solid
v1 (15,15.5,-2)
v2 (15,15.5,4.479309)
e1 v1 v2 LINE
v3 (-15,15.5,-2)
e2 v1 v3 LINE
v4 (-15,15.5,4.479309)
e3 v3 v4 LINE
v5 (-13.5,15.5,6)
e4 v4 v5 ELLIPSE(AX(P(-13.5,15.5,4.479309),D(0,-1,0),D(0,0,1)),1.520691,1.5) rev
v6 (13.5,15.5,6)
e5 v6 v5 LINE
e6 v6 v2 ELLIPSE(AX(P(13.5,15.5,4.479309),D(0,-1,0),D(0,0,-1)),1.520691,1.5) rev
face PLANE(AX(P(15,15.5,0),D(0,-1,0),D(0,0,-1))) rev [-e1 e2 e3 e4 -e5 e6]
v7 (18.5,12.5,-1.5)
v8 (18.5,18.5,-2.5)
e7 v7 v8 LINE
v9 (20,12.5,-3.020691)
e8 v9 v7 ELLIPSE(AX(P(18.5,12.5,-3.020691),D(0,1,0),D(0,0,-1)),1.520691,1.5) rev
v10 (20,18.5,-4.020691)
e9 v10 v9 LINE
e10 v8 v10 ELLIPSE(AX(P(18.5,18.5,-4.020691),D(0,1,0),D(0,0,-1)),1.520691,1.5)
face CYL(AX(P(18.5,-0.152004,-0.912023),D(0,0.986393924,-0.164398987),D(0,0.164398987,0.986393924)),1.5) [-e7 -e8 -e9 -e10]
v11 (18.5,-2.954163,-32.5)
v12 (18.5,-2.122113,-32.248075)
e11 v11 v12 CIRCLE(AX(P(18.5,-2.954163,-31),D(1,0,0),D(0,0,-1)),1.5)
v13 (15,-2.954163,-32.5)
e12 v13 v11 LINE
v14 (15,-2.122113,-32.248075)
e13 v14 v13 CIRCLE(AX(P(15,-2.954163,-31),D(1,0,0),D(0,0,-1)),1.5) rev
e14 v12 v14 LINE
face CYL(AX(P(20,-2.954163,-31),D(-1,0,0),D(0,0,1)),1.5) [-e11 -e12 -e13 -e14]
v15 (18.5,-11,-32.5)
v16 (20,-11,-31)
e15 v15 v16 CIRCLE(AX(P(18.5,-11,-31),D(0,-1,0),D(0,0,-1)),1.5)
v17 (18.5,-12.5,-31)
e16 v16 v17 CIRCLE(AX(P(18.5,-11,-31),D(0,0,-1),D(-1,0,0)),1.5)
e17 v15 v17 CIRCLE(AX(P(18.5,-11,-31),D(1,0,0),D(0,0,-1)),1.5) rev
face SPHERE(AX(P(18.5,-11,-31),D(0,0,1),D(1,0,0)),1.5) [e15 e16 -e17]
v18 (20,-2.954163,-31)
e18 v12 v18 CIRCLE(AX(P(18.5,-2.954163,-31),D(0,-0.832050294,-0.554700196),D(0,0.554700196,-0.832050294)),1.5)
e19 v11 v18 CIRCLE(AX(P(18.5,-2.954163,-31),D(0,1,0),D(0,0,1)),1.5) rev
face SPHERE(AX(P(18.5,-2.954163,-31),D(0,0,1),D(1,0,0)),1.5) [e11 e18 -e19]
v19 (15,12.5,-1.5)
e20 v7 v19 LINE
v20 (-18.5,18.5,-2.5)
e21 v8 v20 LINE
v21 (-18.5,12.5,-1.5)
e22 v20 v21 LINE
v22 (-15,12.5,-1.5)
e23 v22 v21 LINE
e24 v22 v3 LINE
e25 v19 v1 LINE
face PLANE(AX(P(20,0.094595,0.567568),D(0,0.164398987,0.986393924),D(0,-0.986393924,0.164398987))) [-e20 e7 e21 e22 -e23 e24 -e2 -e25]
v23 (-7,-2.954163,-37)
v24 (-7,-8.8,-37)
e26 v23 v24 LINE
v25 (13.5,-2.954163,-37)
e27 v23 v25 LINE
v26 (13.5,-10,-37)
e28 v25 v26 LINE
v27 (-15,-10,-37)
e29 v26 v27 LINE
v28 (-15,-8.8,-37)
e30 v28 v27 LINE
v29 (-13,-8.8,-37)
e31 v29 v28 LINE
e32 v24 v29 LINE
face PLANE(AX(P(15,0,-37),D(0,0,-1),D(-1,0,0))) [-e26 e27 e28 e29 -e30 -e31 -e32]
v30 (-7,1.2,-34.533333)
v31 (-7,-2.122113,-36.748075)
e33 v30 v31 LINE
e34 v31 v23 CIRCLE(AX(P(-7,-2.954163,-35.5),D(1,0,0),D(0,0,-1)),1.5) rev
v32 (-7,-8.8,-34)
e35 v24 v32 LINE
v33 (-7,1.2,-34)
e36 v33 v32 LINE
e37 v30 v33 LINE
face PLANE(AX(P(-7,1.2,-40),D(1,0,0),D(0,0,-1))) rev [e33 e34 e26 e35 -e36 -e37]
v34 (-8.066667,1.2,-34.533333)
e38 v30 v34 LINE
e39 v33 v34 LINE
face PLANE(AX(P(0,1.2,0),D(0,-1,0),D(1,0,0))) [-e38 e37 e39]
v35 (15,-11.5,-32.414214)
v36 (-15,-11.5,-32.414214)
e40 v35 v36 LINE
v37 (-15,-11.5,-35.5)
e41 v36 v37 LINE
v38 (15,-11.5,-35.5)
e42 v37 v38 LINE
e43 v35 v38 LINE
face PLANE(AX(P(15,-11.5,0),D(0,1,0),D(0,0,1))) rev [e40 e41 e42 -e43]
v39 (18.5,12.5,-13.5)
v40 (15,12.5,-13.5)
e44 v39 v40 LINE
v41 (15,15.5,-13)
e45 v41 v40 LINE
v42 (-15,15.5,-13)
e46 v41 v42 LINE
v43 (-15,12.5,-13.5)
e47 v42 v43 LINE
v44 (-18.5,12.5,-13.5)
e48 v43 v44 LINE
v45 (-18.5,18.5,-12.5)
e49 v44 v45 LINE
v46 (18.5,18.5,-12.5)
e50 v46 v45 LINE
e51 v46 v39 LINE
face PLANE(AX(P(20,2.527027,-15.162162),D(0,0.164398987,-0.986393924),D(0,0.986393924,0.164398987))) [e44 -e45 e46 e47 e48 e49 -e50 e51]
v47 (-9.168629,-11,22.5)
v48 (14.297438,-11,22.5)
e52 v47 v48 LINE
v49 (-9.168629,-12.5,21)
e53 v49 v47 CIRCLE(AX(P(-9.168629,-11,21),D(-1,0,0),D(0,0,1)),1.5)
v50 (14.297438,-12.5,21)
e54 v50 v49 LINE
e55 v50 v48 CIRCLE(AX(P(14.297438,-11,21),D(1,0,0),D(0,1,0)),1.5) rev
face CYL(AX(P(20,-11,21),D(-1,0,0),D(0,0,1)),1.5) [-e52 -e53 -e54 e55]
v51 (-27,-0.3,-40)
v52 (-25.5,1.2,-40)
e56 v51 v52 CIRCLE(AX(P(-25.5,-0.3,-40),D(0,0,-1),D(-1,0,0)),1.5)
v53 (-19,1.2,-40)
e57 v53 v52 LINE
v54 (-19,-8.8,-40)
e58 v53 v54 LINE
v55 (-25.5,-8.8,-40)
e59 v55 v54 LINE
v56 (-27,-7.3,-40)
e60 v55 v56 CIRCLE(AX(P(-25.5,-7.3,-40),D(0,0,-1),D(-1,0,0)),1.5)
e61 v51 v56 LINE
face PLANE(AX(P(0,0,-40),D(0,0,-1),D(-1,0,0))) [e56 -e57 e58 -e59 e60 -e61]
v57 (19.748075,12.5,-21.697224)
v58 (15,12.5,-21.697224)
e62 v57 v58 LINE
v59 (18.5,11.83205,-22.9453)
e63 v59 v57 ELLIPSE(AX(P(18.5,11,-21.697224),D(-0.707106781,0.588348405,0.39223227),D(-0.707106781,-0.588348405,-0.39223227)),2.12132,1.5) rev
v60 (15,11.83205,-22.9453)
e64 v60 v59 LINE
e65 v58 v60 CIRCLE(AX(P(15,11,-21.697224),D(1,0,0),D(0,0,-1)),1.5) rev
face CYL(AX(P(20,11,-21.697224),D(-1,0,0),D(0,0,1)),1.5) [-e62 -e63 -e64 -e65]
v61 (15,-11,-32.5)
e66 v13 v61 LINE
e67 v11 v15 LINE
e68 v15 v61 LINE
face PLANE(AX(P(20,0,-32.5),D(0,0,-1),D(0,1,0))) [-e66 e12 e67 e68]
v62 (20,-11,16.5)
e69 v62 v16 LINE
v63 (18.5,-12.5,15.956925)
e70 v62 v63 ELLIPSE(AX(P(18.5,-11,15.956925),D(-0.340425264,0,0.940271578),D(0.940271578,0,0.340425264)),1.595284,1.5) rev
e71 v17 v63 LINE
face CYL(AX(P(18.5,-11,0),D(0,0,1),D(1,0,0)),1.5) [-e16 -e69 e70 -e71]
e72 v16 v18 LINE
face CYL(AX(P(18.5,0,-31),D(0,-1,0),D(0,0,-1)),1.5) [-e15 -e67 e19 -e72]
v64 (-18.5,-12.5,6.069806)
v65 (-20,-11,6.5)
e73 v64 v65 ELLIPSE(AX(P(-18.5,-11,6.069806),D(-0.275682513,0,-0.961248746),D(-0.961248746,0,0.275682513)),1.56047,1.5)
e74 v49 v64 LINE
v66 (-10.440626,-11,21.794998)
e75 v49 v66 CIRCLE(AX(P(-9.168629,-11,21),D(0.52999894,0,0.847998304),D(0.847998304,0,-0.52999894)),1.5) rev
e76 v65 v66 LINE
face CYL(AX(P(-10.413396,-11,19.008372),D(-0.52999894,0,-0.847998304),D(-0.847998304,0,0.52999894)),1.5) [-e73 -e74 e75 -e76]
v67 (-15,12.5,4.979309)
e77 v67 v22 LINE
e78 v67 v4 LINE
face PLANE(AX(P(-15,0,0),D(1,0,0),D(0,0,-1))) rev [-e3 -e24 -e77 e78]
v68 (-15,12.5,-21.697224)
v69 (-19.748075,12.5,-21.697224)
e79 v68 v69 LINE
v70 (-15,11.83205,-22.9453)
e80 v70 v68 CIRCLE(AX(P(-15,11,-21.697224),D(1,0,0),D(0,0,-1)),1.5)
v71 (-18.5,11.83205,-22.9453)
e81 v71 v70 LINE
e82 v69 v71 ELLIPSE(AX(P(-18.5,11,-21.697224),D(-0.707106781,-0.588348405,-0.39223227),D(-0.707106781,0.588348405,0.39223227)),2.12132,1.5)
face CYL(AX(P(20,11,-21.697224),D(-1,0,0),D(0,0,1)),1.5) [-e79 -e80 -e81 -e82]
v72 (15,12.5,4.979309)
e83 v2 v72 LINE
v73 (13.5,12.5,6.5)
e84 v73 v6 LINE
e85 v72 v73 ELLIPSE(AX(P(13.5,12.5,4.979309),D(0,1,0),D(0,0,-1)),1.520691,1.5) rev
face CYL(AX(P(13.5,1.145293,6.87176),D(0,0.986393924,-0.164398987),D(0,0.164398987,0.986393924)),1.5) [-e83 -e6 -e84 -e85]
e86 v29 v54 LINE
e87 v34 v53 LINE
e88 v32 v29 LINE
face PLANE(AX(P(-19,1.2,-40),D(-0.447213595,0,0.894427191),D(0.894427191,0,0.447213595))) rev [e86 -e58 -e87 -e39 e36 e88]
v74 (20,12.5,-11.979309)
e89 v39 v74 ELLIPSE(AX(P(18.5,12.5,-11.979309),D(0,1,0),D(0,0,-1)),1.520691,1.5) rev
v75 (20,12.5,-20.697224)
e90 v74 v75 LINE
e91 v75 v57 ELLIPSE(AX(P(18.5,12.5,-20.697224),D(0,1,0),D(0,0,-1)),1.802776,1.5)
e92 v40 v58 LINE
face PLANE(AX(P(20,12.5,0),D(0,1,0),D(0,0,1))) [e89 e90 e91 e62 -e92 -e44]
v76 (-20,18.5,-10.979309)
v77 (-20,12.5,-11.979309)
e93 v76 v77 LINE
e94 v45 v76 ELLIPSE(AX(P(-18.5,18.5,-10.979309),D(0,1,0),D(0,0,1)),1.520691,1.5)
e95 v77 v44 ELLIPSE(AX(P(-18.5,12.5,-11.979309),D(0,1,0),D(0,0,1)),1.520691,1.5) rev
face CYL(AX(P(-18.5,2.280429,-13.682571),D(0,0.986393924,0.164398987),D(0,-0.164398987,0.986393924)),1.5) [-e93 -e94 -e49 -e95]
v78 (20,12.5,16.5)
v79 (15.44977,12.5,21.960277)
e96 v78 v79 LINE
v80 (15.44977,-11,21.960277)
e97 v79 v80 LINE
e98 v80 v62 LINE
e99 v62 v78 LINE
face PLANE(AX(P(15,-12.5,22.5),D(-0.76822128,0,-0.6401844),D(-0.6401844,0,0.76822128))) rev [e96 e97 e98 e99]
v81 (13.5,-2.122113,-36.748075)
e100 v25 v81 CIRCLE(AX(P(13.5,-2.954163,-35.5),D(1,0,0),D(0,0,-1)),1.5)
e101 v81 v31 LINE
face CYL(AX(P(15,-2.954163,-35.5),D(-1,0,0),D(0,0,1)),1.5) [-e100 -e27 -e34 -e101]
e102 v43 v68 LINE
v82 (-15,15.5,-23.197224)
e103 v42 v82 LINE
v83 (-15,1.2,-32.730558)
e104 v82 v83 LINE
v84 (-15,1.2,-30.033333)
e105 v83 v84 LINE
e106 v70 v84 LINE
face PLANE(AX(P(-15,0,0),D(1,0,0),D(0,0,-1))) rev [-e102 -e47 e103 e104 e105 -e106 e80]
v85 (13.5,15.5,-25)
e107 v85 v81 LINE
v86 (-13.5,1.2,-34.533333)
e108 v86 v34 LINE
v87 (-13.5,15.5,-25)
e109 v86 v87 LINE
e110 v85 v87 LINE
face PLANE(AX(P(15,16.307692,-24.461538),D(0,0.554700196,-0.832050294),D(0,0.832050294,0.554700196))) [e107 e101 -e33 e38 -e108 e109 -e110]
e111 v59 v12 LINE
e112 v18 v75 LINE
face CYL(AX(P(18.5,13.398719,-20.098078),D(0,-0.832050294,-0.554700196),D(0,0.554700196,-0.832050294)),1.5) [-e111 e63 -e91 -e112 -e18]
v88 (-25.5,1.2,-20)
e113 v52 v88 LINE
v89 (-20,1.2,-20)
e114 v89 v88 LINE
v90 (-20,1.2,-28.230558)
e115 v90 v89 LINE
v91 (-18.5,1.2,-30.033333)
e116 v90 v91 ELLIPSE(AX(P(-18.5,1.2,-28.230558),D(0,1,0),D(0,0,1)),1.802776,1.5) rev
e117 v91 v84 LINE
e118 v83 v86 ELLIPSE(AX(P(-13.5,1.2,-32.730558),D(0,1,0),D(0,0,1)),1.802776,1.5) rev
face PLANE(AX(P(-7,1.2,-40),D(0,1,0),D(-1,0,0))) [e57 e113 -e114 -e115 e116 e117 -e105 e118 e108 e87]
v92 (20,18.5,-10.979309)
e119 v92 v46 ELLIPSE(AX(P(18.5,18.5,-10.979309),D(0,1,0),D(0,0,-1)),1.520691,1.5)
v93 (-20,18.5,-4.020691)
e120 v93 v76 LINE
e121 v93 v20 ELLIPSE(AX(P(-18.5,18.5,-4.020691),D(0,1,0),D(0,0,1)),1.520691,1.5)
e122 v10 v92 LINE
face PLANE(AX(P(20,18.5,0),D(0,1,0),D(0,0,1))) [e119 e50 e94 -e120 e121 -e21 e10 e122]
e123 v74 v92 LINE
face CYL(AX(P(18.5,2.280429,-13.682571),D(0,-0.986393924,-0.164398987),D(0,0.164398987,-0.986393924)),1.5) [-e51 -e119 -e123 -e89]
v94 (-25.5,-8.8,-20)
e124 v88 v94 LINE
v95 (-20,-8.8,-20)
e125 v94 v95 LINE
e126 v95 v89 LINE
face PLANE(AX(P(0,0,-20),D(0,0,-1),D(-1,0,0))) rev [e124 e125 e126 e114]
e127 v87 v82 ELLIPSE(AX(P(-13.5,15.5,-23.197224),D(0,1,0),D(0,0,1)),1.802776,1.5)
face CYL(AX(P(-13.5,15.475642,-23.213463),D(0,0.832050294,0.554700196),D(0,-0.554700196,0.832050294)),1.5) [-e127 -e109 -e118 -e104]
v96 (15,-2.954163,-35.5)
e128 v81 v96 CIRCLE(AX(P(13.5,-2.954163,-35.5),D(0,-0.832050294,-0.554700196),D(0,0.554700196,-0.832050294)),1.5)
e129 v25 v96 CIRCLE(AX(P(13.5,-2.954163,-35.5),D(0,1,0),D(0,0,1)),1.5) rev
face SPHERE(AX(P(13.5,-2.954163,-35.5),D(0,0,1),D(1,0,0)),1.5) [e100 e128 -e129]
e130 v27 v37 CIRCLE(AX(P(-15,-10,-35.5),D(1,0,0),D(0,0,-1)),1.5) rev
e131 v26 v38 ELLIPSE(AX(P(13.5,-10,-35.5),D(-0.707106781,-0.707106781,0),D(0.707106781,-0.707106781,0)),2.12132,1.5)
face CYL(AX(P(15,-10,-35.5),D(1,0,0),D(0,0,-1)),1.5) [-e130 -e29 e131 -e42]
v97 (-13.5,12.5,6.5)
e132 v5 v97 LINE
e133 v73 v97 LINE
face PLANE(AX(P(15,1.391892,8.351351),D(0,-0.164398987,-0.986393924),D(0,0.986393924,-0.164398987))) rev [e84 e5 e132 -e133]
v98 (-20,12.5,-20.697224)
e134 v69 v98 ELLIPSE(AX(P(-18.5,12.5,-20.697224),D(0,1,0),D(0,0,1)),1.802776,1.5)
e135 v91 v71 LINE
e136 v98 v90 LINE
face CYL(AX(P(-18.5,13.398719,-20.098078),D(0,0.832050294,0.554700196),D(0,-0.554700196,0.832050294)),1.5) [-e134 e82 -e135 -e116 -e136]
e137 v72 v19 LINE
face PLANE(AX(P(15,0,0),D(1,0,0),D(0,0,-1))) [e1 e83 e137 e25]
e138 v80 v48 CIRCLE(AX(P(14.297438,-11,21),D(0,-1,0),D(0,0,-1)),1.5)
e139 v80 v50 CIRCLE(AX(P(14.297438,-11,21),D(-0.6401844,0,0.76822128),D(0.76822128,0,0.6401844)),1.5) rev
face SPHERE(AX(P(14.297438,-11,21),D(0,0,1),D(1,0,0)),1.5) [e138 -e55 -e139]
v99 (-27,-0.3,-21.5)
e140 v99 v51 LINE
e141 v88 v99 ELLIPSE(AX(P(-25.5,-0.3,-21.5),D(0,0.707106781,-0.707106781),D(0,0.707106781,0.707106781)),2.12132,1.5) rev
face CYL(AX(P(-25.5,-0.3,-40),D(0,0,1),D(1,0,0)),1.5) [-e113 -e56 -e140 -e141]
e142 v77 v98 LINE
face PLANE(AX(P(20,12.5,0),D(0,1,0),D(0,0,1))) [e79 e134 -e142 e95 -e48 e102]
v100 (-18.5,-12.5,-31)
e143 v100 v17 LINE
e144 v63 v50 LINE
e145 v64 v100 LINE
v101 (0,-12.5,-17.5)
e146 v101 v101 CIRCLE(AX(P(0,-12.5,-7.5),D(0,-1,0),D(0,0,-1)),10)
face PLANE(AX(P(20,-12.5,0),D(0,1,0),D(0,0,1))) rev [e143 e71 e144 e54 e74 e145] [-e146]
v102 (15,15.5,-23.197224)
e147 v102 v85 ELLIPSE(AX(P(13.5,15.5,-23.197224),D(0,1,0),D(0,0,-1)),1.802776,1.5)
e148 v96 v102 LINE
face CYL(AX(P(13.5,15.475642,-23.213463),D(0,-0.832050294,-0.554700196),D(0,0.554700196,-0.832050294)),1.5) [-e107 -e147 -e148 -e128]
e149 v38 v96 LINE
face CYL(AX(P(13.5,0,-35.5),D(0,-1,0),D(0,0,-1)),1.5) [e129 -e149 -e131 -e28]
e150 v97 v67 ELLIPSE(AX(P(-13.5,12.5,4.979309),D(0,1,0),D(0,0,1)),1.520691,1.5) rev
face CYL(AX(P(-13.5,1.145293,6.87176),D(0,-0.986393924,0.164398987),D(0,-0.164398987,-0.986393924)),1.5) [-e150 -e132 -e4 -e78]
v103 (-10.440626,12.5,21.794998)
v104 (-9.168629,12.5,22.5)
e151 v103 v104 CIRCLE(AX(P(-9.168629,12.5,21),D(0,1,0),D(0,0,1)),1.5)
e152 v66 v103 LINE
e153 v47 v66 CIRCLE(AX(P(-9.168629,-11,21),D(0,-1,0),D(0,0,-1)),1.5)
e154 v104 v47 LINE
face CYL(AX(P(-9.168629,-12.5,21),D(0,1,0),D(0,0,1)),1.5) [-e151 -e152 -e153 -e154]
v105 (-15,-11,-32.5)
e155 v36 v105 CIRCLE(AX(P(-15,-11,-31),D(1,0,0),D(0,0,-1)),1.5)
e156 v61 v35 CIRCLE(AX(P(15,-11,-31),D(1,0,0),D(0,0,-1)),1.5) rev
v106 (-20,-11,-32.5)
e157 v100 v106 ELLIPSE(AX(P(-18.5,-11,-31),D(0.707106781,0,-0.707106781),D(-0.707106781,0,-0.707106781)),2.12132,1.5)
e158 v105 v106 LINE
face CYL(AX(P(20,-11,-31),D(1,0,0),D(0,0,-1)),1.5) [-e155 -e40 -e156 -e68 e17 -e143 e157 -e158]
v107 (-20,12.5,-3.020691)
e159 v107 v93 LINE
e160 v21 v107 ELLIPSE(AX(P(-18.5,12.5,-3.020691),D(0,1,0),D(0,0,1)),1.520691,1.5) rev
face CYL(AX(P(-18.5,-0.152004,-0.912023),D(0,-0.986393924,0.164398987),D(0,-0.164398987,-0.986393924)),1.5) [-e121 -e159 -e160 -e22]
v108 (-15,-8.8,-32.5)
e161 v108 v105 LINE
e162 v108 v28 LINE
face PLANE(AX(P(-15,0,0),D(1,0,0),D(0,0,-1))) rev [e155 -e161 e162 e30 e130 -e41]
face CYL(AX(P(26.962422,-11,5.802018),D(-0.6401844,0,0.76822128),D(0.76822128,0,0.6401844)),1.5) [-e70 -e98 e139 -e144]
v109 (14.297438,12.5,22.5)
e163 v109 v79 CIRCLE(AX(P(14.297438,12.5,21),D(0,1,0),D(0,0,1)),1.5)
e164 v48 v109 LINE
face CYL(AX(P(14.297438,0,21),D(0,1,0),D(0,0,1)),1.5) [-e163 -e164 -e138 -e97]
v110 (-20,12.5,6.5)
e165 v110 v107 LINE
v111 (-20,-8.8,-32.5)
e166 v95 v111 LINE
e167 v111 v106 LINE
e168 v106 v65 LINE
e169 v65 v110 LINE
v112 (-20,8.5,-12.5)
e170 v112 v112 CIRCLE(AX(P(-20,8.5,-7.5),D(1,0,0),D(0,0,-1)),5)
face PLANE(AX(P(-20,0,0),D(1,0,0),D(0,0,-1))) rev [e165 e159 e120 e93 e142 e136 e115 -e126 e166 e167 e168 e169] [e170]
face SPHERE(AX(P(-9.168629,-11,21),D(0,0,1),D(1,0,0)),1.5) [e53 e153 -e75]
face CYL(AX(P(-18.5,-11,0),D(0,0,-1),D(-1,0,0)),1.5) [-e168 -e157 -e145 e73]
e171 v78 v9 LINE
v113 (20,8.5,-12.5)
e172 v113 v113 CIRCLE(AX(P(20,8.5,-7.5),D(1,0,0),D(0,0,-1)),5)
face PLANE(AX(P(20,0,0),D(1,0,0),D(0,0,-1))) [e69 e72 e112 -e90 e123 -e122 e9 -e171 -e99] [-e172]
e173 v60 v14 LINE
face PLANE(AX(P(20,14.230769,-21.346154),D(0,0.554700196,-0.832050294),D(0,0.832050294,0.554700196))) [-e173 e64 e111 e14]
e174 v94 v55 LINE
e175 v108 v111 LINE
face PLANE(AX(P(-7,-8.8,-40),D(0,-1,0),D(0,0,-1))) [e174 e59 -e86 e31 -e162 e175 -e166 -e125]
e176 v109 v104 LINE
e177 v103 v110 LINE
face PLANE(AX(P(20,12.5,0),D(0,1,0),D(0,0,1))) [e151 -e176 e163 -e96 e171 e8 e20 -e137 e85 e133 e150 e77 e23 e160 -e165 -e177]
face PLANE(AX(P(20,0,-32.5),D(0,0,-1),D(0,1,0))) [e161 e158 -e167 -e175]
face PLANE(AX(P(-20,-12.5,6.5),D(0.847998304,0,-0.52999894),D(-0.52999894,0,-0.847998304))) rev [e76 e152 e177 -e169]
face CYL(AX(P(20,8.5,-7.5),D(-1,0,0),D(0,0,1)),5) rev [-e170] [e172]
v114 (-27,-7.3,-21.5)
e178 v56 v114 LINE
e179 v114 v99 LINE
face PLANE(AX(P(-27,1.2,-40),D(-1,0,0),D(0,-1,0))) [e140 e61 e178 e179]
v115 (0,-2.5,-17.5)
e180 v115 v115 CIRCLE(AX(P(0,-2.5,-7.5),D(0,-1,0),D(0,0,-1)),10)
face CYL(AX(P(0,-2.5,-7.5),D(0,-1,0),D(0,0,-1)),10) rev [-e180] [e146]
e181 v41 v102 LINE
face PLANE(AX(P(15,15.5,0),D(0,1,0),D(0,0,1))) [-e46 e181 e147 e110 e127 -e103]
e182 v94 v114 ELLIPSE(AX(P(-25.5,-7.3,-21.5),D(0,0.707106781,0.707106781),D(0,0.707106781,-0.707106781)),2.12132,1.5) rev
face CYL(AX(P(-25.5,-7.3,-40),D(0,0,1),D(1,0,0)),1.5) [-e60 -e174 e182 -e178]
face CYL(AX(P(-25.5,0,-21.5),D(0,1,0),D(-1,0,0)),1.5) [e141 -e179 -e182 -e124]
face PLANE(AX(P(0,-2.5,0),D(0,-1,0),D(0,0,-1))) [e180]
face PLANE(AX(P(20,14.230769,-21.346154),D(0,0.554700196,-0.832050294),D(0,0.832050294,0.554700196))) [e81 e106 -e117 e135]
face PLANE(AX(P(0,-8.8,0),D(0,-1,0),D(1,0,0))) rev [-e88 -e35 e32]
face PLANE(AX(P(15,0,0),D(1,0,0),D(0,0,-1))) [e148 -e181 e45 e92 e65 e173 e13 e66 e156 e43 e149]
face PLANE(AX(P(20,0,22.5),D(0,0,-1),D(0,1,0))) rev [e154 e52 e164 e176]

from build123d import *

# Parameters (mm, degrees)
SKETCH1_R           = 5
BOSS_EXTRUDE1_DEPTH = 20
BOSS_EXTRUDE2_DEPTH = 15
CUT_EXTRUDE2_DEPTH  = 49.928519291
BOSS_EXTRUDE3_START = -20
SKETCH4_W           = 20
SKETCH4_H           = 10
BOSS_EXTRUDE3_DEPTH = 20
CUT_EXTRUDE3_DEPTH  = 5
SKETCH2_R           = 10
CUT_EXTRUDE1_DEPTH  = 10
FILLET1_R           = 1.5


with BuildPart() as part:
    # Sketch1 → Boss-Extrude1 (new, symmetric)
    with BuildSketch(Plane(origin=(0, 0, 0), x_dir=(0, 0, -1), z_dir=(1, 0, 0))):
        Polygon((13.5, 12.5), (22.5, 12.5), (32.5, -2.5), (32.5, -12.5), (-22.5, -12.5), (-22.5, 12.5), (1.5, 12.5), (2.5, 18.5), (12.5, 18.5), align=None)
        with Locations((7.5, 8.5)):
            Circle(SKETCH1_R, mode=Mode.SUBTRACT)
    extrude(amount=BOSS_EXTRUDE1_DEPTH, both=True)

    # Sketch1<3> → Boss-Extrude2 (add, symmetric)
    with BuildSketch(Plane(origin=(0, 0, 0), x_dir=(0, 0, -1), z_dir=(1, 0, 0))):
        Polygon((13.5, 12.5), (22.5, 12.5), (32.5, -2.5), (32.5, -11.5), (37, -11.5), (37, -2.5), (25, 15.5), (13, 15.5), align=None)
        Polygon((1.5, 12.5), (2, 15.5), (-6, 15.5), (-6.5, 12.5), align=None)
    extrude(amount=BOSS_EXTRUDE2_DEPTH, both=True)

    # Sketch3 → Cut-Extrude2 (cut, through all)
    with BuildSketch(Plane(origin=(0, 12.5, 0), x_dir=(1, 0, 0), z_dir=(0, 1, 0))):
        Polygon((15, -22.5), (20, -16.5), (20, -22.5), align=None)
        Polygon((-10, -22.5), (-20, -22.5), (-20, -6.5), align=None)
    extrude(amount=-CUT_EXTRUDE2_DEPTH, mode=Mode.SUBTRACT)

    # Sketch4 → Boss-Extrude3 (add)
    with BuildSketch(Plane.XY.offset(BOSS_EXTRUDE3_START)):
        with Locations((-17, -3.8)):
            Rectangle(SKETCH4_W, SKETCH4_H)
    extrude(amount=-BOSS_EXTRUDE3_DEPTH)

    # Sketch5 → Cut-Extrude3 (cut, symmetric)
    with BuildSketch(Plane(origin=(0, -3.8, 0), x_dir=(-1, 0, 0), z_dir=(0, -1, 0))):
        Polygon((7, 40), (19, 40), (7, 34), align=None)
    extrude(amount=CUT_EXTRUDE3_DEPTH, both=True, mode=Mode.SUBTRACT)

    # Sketch2 → Cut-Extrude1 (cut)
    with BuildSketch(Plane.XZ.offset(12.5)):
        with Locations(Location((0, -7.5, 0), (0, 0, 270))):
            Circle(SKETCH2_R)
    extrude(amount=-CUT_EXTRUDE1_DEPTH, mode=Mode.SUBTRACT)

    # Fillet1
    # the kernel refuses this fillet: 1.5 mm, written as the material it takes off along each edge
    with BuildSketch(Plane(origin=(-9.168628538, -11, 21), x_dir=(0, 0, 1), z_dir=(0, -1, 0))) as fillet1_piece_1_section:
        Polygon((0, 0), (FILLET1_R, 0), (FILLET1_R, FILLET1_R * 0.554247641507), (FILLET1_R * 0.529998940003, FILLET1_R * 0.847998304005), align=None)
    fillet1_piece_1 = extrude(amount=FILLET1_R, mode=Mode.PRIVATE)
    fillet1_piece_1 = fillet1_piece_1 - Plane(origin=(-9.168628538, -11, 21), x_dir=(0.4847685323929452, 0, -0.8746424812468178), z_dir=(0, -1, 0)) * Sphere(FILLET1_R, mode=Mode.PRIVATE)
    add(fillet1_piece_1, mode=Mode.SUBTRACT)
    with BuildSketch(Plane(origin=(18.5, -2.954163457, -31), x_dir=(0, 0, -1), z_dir=(1, 0, 0))) as fillet1_piece_2_section:
        Polygon((0, 0), (FILLET1_R, 0), (FILLET1_R, FILLET1_R * 0.302775637732), (FILLET1_R * 0.832050294338, FILLET1_R * 0.554700196225), align=None)
    fillet1_piece_2 = extrude(amount=FILLET1_R, mode=Mode.PRIVATE)
    fillet1_piece_2 = fillet1_piece_2 - Plane(origin=(18.5, -2.954163457, -31), x_dir=(0, -0.2897841486884299, 0.9570920264890529), z_dir=(1, 0, 0)) * Sphere(FILLET1_R, mode=Mode.PRIVATE)
    add(fillet1_piece_2, mode=Mode.SUBTRACT)
    with BuildSketch(Plane(origin=(18.5, -11, -31), x_dir=(1, 0, 0), z_dir=(0, 0, -1))) as fillet1_piece_3_section:
        Polygon((0, 0), (FILLET1_R, 0), (FILLET1_R, FILLET1_R), (0, FILLET1_R), align=None)
    fillet1_piece_3 = extrude(amount=FILLET1_R, mode=Mode.PRIVATE)
    fillet1_piece_3 = fillet1_piece_3 - Plane(origin=(18.5, -11, -31), x_dir=(-0.7071067811865475, 0.7071067811865475, 0), z_dir=(0, 0, -1)) * Sphere(FILLET1_R, mode=Mode.PRIVATE)
    add(fillet1_piece_3, mode=Mode.SUBTRACT)
    with BuildSketch(Plane(origin=(13.5, -2.954163457, -35.5), x_dir=(0, 0.5547001962252297, -0.8320502943378434), z_dir=(1, 0, 0))) as fillet1_piece_4_section:
        Polygon((0, 0), (FILLET1_R, 0), (FILLET1_R, -FILLET1_R * 0.302775637732), (FILLET1_R * 0.832050294338, -FILLET1_R * 0.554700196225), align=None)
    fillet1_piece_4 = extrude(amount=FILLET1_R, mode=Mode.PRIVATE)
    fillet1_piece_4 = fillet1_piece_4 - Plane(origin=(13.5, -2.954163457, -35.5), x_dir=(0, -0.2897841486884304, 0.9570920264890528), z_dir=(1, 0, 0)) * Sphere(FILLET1_R, mode=Mode.PRIVATE)
    add(fillet1_piece_4, mode=Mode.SUBTRACT)
    with BuildSketch(Plane(origin=(14.297437581, -11, 21), x_dir=(0, 0, 1), z_dir=(0, -1, 0))) as fillet1_piece_5_section:
        Polygon((0, 0), (FILLET1_R, 0), (FILLET1_R, -FILLET1_R * 0.468374945984), (FILLET1_R * 0.640184399664, -FILLET1_R * 0.768221279597), align=None)
    fillet1_piece_5 = extrude(amount=FILLET1_R, mode=Mode.PRIVATE)
    fillet1_piece_5 = fillet1_piece_5 - Plane(origin=(14.297437581, -11, 21), x_dir=(-0.42415539624972376, 0, -0.90558942122368), z_dir=(0, -1, 0)) * Sphere(FILLET1_R, mode=Mode.PRIVATE)
    add(fillet1_piece_5, mode=Mode.SUBTRACT)
    with BuildSketch(Plane(origin=(-10, 14.578428656, 22.5), x_dir=(-0.5299989400031788, 0, -0.8479983040050887), z_dir=(0, -1, 0))) as fillet1_piece_6:
        with BuildLine():
            CenterArc((FILLET1_R * 0.554247641507, FILLET1_R), FILLET1_R, 212.005383208, 57.994616792)
            Line((-FILLET1_R * 0.293750662498, FILLET1_R * 0.470001059997), (0, 0))
            Line((0, 0), (FILLET1_R * 0.554247641507, 0))
        make_face()
    extrude(amount=25.578428656, mode=Mode.SUBTRACT)
    with BuildSketch(Plane(origin=(20, -2.954163457, -32.5), x_dir=(0, 0, 1), z_dir=(0, -1, 0))) as fillet1_piece_7:
        with BuildLine():
            CenterArc((FILLET1_R, FILLET1_R), FILLET1_R, 180, 90)
            Line((0, FILLET1_R), (0, 0))
            Line((0, 0), (FILLET1_R, 0))
        make_face()
    extrude(amount=8.045836543, mode=Mode.SUBTRACT)
    with BuildSketch(Plane(origin=(15, -15.25, -37), x_dir=(0, 0, 1), z_dir=(0, 1, 0))) as fillet1_piece_8:
        with BuildLine():
            CenterArc((FILLET1_R, -FILLET1_R), FILLET1_R, 90, 90)
            Line((0, -FILLET1_R), (0, 0))
            Line((0, 0), (FILLET1_R, 0))
        make_face()
    extrude(amount=12.295836543, mode=Mode.SUBTRACT)
    with BuildSketch(Plane(origin=(13.5, -2.5, -37), x_dir=(0, 0.8320502943378404, 0.5547001962252341), z_dir=(-1, 0, 0))) as fillet1_piece_9:
        with BuildLine():
            CenterArc((FILLET1_R * 0.302775637732, -FILLET1_R), FILLET1_R, 90, 33.690067526)
            Line((-FILLET1_R * 0.251924558493, -FILLET1_R * 0.167949705662), (0, 0))
            Line((0, 0), (FILLET1_R * 0.302775637732, 0))
        make_face()
    extrude(amount=21.635408641, mode=Mode.SUBTRACT)
    with BuildSketch(Plane(origin=(-15, -1.920188604, -36.613459069), x_dir=(0, -0.5547001962252296, 0.8320502943378434), z_dir=(0, 0.8320502943378434, 0.5547001962252297))) as fillet1_piece_10_section:
        with BuildLine():
            CenterArc((FILLET1_R, FILLET1_R), FILLET1_R, 180, 90)
            Line((0, FILLET1_R), (0, 0))
            Line((0, 0), (FILLET1_R, 0))
        make_face()
    fillet1_piece_10 = extrude(amount=24.68646108, mode=Mode.PRIVATE)
    fillet1_piece_10 = split(fillet1_piece_10, bisect_by=Plane(origin=(-14.658418679, 1.2, -28.384678204), z_dir=(0, 1, 0)), keep=Keep.TOP, mode=Mode.PRIVATE)
    add(fillet1_piece_10, mode=Mode.SUBTRACT)
    with BuildSketch(Plane(origin=(15, -2.122113162, -36.748075442), x_dir=(0, -0.5547001962252296, 0.8320502943378433), z_dir=(0, 0.8320502943378434, 0.5547001962252297))) as fillet1_piece_11:
        with BuildLine():
            CenterArc((FILLET1_R, -FILLET1_R), FILLET1_R, 90, 90)
            Line((0, -FILLET1_R), (0, 0))
            Line((0, 0), (FILLET1_R, 0))
        make_face()
    extrude(amount=24.929144196, mode=Mode.SUBTRACT)
    with BuildSketch(Plane(origin=(20, 15.620188604, -20.419874264), x_dir=(0, -0.5547001962252294, 0.8320502943378434), z_dir=(0, -0.8320502943378436, -0.5547001962252295))) as fillet1_piece_12:
        with BuildLine():
            CenterArc((FILLET1_R, FILLET1_R), FILLET1_R, 180, 90)
            Line((0, FILLET1_R), (0, 0))
            Line((0, 0), (FILLET1_R, 0))
        make_face()
    extrude(amount=21.323592921, mode=Mode.SUBTRACT)
    with BuildSketch(Plane(origin=(-20, 15.620188604, -20.419874264), x_dir=(1, 0, 0), z_dir=(0, -0.8320502943378436, -0.5547001962252295))) as fillet1_piece_13_section:
        with BuildLine():
            CenterArc((FILLET1_R, FILLET1_R), FILLET1_R, 180, 90)
            Line((0, FILLET1_R), (0, 0))
            Line((0, 0), (FILLET1_R, 0))
        make_face()
    fillet1_piece_13 = extrude(amount=21.080909804, mode=Mode.PRIVATE)
    fillet1_piece_13 = split(fillet1_piece_13, bisect_by=Plane(origin=(-19.657999481, 1.2, -24.885399818), z_dir=(0, 1, 0)), keep=Keep.TOP, mode=Mode.PRIVATE)
    add(fillet1_piece_13, mode=Mode.SUBTRACT)
    with BuildSketch(Plane(origin=(-15, 12.5, -22.5), x_dir=(0, 0, 1), z_dir=(-1, 0, 0)), Plane(origin=(22.006939094, 12.5, -22.5), x_dir=(0, 0, 1), z_dir=(-1, 0, 0))) as fillet1_piece_14:
        with BuildLine():
            CenterArc((FILLET1_R * 0.535183758488, -FILLET1_R), FILLET1_R, 90, 56.309932474)
            Line((-FILLET1_R * 0.29686653585, -FILLET1_R * 0.445299803775), (0, 0))
            Line((0, 0), (FILLET1_R * 0.535183758488, 0))
        make_face()
    extrude(amount=7.006939094, mode=Mode.SUBTRACT)
    with BuildSketch(Plane(origin=(18.5, -2.5, -32.5), x_dir=(0, -1, 0), z_dir=(-1, 0, 0))) as fillet1_piece_15:
        with BuildLine():
            CenterArc((FILLET1_R * 0.302775637732, FILLET1_R), FILLET1_R, 236.309932474, 33.690067526)
            Line((-FILLET1_R * 0.251924558493, FILLET1_R * 0.167949705662), (0, 0))
            Line((0, 0), (FILLET1_R * 0.302775637732, 0))
        make_face()
    extrude(amount=3.5, mode=Mode.SUBTRACT)
    with BuildSketch(Plane(origin=(15, 14.256406047, 22.5), x_dir=(0.6401843996644804, 0, -0.7682212795973754), z_dir=(0, -1, 0))) as fillet1_piece_16:
        with BuildLine():
            CenterArc((FILLET1_R * 0.468374945984, -FILLET1_R), FILLET1_R, 90, 50.194428908)
            Line((-FILLET1_R * 0.299846333613, -FILLET1_R * 0.359815600336), (0, 0))
            Line((0, 0), (FILLET1_R * 0.468374945984, 0))
        make_face()
    extrude(amount=25.256406047, mode=Mode.SUBTRACT)
    with BuildSketch(Plane(origin=(-27, 4.95, -20), x_dir=(1, 0, 0), z_dir=(0, -1, 0))) as fillet1_piece_17:
        with BuildLine():
            CenterArc((FILLET1_R, -FILLET1_R), FILLET1_R, 90, 90)
            Line((0, -FILLET1_R), (0, 0))
            Line((0, 0), (FILLET1_R, 0))
        make_face()
    extrude(amount=17.5, mode=Mode.SUBTRACT)
    with BuildSketch(Plane(origin=(18.5, -12.5, -32.5), x_dir=(0, 0, 1), z_dir=(-1, 0, 0))) as fillet1_piece_18_section:
        with BuildLine():
            CenterArc((FILLET1_R, FILLET1_R), FILLET1_R, 180, 90)
            Line((0, FILLET1_R), (0, 0))
            Line((0, 0), (FILLET1_R, 0))
        make_face()
    fillet1_piece_18 = extrude(amount=42.25, mode=Mode.PRIVATE)
    fillet1_piece_18 = split(fillet1_piece_18, bisect_by=Plane(origin=(15, -12.205839998, -32.142494848), z_dir=(1, 0, 0)), keep=Keep.TOP, mode=Mode.PRIVATE)
    fillet1_piece_18 = split(fillet1_piece_18, bisect_by=Plane(origin=(16.75, -11.5, -32.142494848), z_dir=(0, -1, 0)), keep=Keep.TOP, mode=Mode.PRIVATE)
    add(fillet1_piece_18, mode=Mode.SUBTRACT)
    with BuildSketch(Plane(origin=(18.5, -12.5, -32.5), x_dir=(0, 0, 1), z_dir=(-1, 0, 0))) as fillet1_piece_19_section:
        with BuildLine():
            CenterArc((FILLET1_R, FILLET1_R), FILLET1_R, 180, 90)
            Line((0, FILLET1_R), (0, 0))
            Line((0, 0), (FILLET1_R, 0))
        make_face()
    fillet1_piece_19 = extrude(amount=42.25, mode=Mode.PRIVATE)
    fillet1_piece_19 = split(fillet1_piece_19, bisect_by=Plane(origin=(15, -11.310985745, -32.495303959), z_dir=(1, 0, 0)), keep=Keep.TOP, mode=Mode.PRIVATE)
    fillet1_piece_19 = split(fillet1_piece_19, bisect_by=Plane(origin=(16.75, -11.5, -32.495303959), z_dir=(0, 1, 0)), keep=Keep.TOP, mode=Mode.PRIVATE)
    add(fillet1_piece_19, mode=Mode.SUBTRACT)
    with BuildSketch(Plane(origin=(18.5, -12.5, -32.5), x_dir=(0, 0, 1), z_dir=(-1, 0, 0))) as fillet1_piece_20_section:
        with BuildLine():
            CenterArc((FILLET1_R, FILLET1_R), FILLET1_R, 180, 90)
            Line((0, FILLET1_R), (0, 0))
            Line((0, 0), (FILLET1_R, 0))
        make_face()
    fillet1_piece_20 = extrude(amount=42.25, mode=Mode.PRIVATE)
    fillet1_piece_20 = split(fillet1_piece_20, bisect_by=Plane(origin=(15, -12.205839998, -32.142494848), z_dir=(-1, 0, 0)), keep=Keep.TOP, mode=Mode.PRIVATE)
    fillet1_piece_20 = split(fillet1_piece_20, bisect_by=Plane(origin=(-15, -12.205839998, -32.142494848), z_dir=(1, 0, 0)), keep=Keep.TOP, mode=Mode.PRIVATE)
    fillet1_piece_20 = split(fillet1_piece_20, bisect_by=Plane(origin=(0, -11.5, -32.142494848), z_dir=(0, -1, 0)), keep=Keep.TOP, mode=Mode.PRIVATE)
    add(fillet1_piece_20, mode=Mode.SUBTRACT)
    with BuildSketch(Plane(origin=(18.5, -12.5, -32.5), x_dir=(0, 0, 1), z_dir=(-1, 0, 0))) as fillet1_piece_21_section:
        with BuildLine():
            CenterArc((FILLET1_R, FILLET1_R), FILLET1_R, 180, 90)
            Line((0, FILLET1_R), (0, 0))
            Line((0, 0), (FILLET1_R, 0))
        make_face()
    fillet1_piece_21 = extrude(amount=42.25, mode=Mode.PRIVATE)
    fillet1_piece_21 = split(fillet1_piece_21, bisect_by=Plane(origin=(-15, -12.205839998, -32.142494848), z_dir=(-1, 0, 0)), keep=Keep.TOP, mode=Mode.PRIVATE)
    fillet1_piece_21 = split(fillet1_piece_21, bisect_by=Plane(origin=(-19.375, -11.5, -32.142494848), z_dir=(0, -1, 0)), keep=Keep.TOP, mode=Mode.PRIVATE)
    add(fillet1_piece_21, mode=Mode.SUBTRACT)
    with BuildSketch(Plane(origin=(18.5, -12.5, -32.5), x_dir=(0, 0, 1), z_dir=(-1, 0, 0))) as fillet1_piece_22_section:
        with BuildLine():
            CenterArc((FILLET1_R, FILLET1_R), FILLET1_R, 180, 90)
            Line((0, FILLET1_R), (0, 0))
            Line((0, 0), (FILLET1_R, 0))
        make_face()
    fillet1_piece_22 = extrude(amount=42.25, mode=Mode.PRIVATE)
    fillet1_piece_22 = split(fillet1_piece_22, bisect_by=Plane(origin=(-15, -11.310985745, -32.495303959), z_dir=(-1, 0, 0)), keep=Keep.TOP, mode=Mode.PRIVATE)
    fillet1_piece_22 = split(fillet1_piece_22, bisect_by=Plane(origin=(-19.375, -11.5, -32.495303959), z_dir=(0, 1, 0)), keep=Keep.TOP, mode=Mode.PRIVATE)
    add(fillet1_piece_22, mode=Mode.SUBTRACT)
    with BuildSketch(Plane(origin=(-20, -12.5, -36.25), x_dir=(0, 1, 0), z_dir=(0, 0, 1))) as fillet1_piece_23:
        with BuildLine():
            CenterArc((FILLET1_R, -FILLET1_R), FILLET1_R, 90, 90)
            Line((0, -FILLET1_R), (0, 0))
            Line((0, 0), (FILLET1_R, 0))
        make_face()
    extrude(amount=46.5, mode=Mode.SUBTRACT)
    with BuildSketch(Plane(origin=(-21.987496025, -12.5, 3.32000636), x_dir=(0, 1, 0), z_dir=(0.52999894000318, 0, 0.847998304005088))) as fillet1_piece_24:
        with BuildLine():
            CenterArc((FILLET1_R, -FILLET1_R), FILLET1_R, 90, 90)
            Line((0, -FILLET1_R), (0, 0))
            Line((0, 0), (FILLET1_R, 0))
        make_face()
    extrude(amount=21.786590802, mode=Mode.SUBTRACT)
    with BuildSketch(Plane(origin=(14.297437581, -12.5, 22.5), x_dir=(0, 0, -1), z_dir=(-1, 0, 0))) as fillet1_piece_25:
        with BuildLine():
            CenterArc((FILLET1_R, -FILLET1_R), FILLET1_R, 90, 90)
            Line((0, -FILLET1_R), (0, 0))
            Line((0, 0), (FILLET1_R, 0))
        make_face()
    extrude(amount=23.466066119, mode=Mode.SUBTRACT)
    with BuildSketch(Plane(origin=(15.4497695, -12.5, 21.960276599), x_dir=(-0.7682212795973761, 0, -0.6401843996644797), z_dir=(0.6401843996644797, 0, -0.7682212795973761))) as fillet1_piece_26:
        with BuildLine():
            CenterArc((FILLET1_R, FILLET1_R), FILLET1_R, 180, 90)
            Line((0, FILLET1_R), (0, 0))
            Line((0, 0), (FILLET1_R, 0))
        make_face()
    extrude(amount=10.857687257, mode=Mode.SUBTRACT)
    with BuildSketch(Plane(origin=(20, -12.5, -31), x_dir=(0, 1, 0), z_dir=(0, 0, 1))) as fillet1_piece_27:
        with BuildLine():
            CenterArc((FILLET1_R, FILLET1_R), FILLET1_R, 180, 90)
            Line((0, FILLET1_R), (0, 0))
            Line((0, 0), (FILLET1_R, 0))
        make_face()
    extrude(amount=51.25, mode=Mode.SUBTRACT)
    with BuildSketch(Plane(origin=(-15, 19.198977214, 5.383503798), x_dir=(0, -0.16439898730535804, -0.9863939238321436), z_dir=(0, -0.9863939238321436, 0.16439898730535804))) as fillet1_piece_28_section:
        with BuildLine():
            CenterArc((FILLET1_R, FILLET1_R), FILLET1_R, 180, 90)
            Line((0, FILLET1_R), (0, 0))
            Line((0, 0), (FILLET1_R, 0))
        make_face()
    fillet1_piece_28 = extrude(amount=10.541381265, mode=Mode.PRIVATE)
    fillet1_piece_28 = split(fillet1_piece_28, bisect_by=Plane(origin=(-14.658878509, 12.5, 5.604715473), z_dir=(0, 1, 0)), keep=Keep.TOP, mode=Mode.PRIVATE)
    add(fillet1_piece_28, mode=Mode.SUBTRACT)
    with BuildSketch(Plane(origin=(15, 19.198977214, 5.383503798), x_dir=(0, -0.16439898730535804, -0.9863939238321436), z_dir=(0, -0.9863939238321436, 0.16439898730535804))) as fillet1_piece_29_section:
        with BuildLine():
            CenterArc((FILLET1_R, -FILLET1_R), FILLET1_R, 90, 90)
            Line((0, -FILLET1_R), (0, 0))
            Line((0, 0), (FILLET1_R, 0))
        make_face()
    fillet1_piece_29 = extrude(amount=10.541381265, mode=Mode.PRIVATE)
    fillet1_piece_29 = split(fillet1_piece_29, bisect_by=Plane(origin=(14.658878509, 12.5, 5.604715473), z_dir=(0, 1, 0)), keep=Keep.TOP, mode=Mode.PRIVATE)
    add(fillet1_piece_29, mode=Mode.SUBTRACT)
    with BuildSketch(Plane(origin=(-20, 22.198977214, -11.883503798), x_dir=(1, 0, 0), z_dir=(0, -0.9863939238321437, -0.1643989873053573))) as fillet1_piece_30_section:
        with BuildLine():
            CenterArc((FILLET1_R, FILLET1_R), FILLET1_R, 180, 90)
            Line((0, FILLET1_R), (0, 0))
            Line((0, 0), (FILLET1_R, 0))
        make_face()
    fillet1_piece_30 = extrude(amount=13.58276253, mode=Mode.PRIVATE)
    fillet1_piece_30 = split(fillet1_piece_30, bisect_by=Plane(origin=(-19.659354127, 12.5, -12.353910306), z_dir=(0, 1, 0)), keep=Keep.TOP, mode=Mode.PRIVATE)
    add(fillet1_piece_30, mode=Mode.SUBTRACT)
    with BuildSketch(Plane(origin=(-20, 8.801022786, -0.883503798), x_dir=(0, -0.16439898730535737, -0.9863939238321437), z_dir=(0, 0.9863939238321437, -0.16439898730535735))) as fillet1_piece_31_section:
        with BuildLine():
            CenterArc((FILLET1_R, -FILLET1_R), FILLET1_R, 90, 90)
            Line((0, -FILLET1_R), (0, 0))
            Line((0, 0), (FILLET1_R, 0))
        make_face()
    fillet1_piece_31 = extrude(amount=13.58276253, mode=Mode.PRIVATE)
    fillet1_piece_31 = split(fillet1_piece_31, bisect_by=Plane(origin=(-19.659354127, 12.5, -2.646089694), z_dir=(0, 1, 0)), keep=Keep.TOP, mode=Mode.PRIVATE)
    add(fillet1_piece_31, mode=Mode.SUBTRACT)
    with BuildSketch(Plane(origin=(20, 8.801022786, -0.883503798), x_dir=(0, -0.16439898730535737, -0.9863939238321437), z_dir=(0, 0.9863939238321437, -0.16439898730535735))) as fillet1_piece_32_section:
        with BuildLine():
            CenterArc((FILLET1_R, FILLET1_R), FILLET1_R, 180, 90)
            Line((0, FILLET1_R), (0, 0))
            Line((0, 0), (FILLET1_R, 0))
        make_face()
    fillet1_piece_32 = extrude(amount=13.58276253, mode=Mode.PRIVATE)
    fillet1_piece_32 = split(fillet1_piece_32, bisect_by=Plane(origin=(19.659354127, 12.5, -2.646089694), z_dir=(0, 1, 0)), keep=Keep.TOP, mode=Mode.PRIVATE)
    add(fillet1_piece_32, mode=Mode.SUBTRACT)
    with BuildSketch(Plane(origin=(20, 22.198977214, -11.883503798), x_dir=(-1, 0, 0), z_dir=(0, -0.9863939238321437, -0.1643989873053573))) as fillet1_piece_33_section:
        with BuildLine():
            CenterArc((FILLET1_R, -FILLET1_R), FILLET1_R, 90, 90)
            Line((0, -FILLET1_R), (0, 0))
            Line((0, 0), (FILLET1_R, 0))
        make_face()
    fillet1_piece_33 = extrude(amount=13.58276253, mode=Mode.PRIVATE)
    fillet1_piece_33 = split(fillet1_piece_33, bisect_by=Plane(origin=(19.659354127, 12.5, -12.353910306), z_dir=(0, 1, 0)), keep=Keep.TOP, mode=Mode.PRIVATE)
    add(fillet1_piece_33, mode=Mode.SUBTRACT)
    with BuildSketch(Plane(origin=(-18.75, -11.5, -37), x_dir=(0, 0, 1), z_dir=(1, 0, 0))) as fillet1_piece_34:
        with BuildLine():
            CenterArc((FILLET1_R, -FILLET1_R), FILLET1_R, 90, 90)
            Line((0, -FILLET1_R), (0, 0))
            Line((0, 0), (FILLET1_R, 0))
        make_face()
    extrude(amount=37.5, mode=Mode.SUBTRACT)
    with BuildSketch(Plane(origin=(-27, -8.8, -16.25), x_dir=(1, 0, 0), z_dir=(0, 0, -1))) as fillet1_piece_35:
        with BuildLine():
            CenterArc((FILLET1_R, -FILLET1_R), FILLET1_R, 90, 90)
            Line((0, -FILLET1_R), (0, 0))
            Line((0, 0), (FILLET1_R, 0))
        make_face()
    extrude(amount=27.5, mode=Mode.SUBTRACT)
    with BuildSketch(Plane(origin=(-27, 1.2, -16.25), x_dir=(1, 0, 0), z_dir=(0, 0, -1))) as fillet1_piece_36:
        with BuildLine():
            CenterArc((FILLET1_R, FILLET1_R), FILLET1_R, 180, 90)
            Line((0, FILLET1_R), (0, 0))
            Line((0, 0), (FILLET1_R, 0))
        make_face()
    extrude(amount=27.5, mode=Mode.SUBTRACT)


solid = part.part
